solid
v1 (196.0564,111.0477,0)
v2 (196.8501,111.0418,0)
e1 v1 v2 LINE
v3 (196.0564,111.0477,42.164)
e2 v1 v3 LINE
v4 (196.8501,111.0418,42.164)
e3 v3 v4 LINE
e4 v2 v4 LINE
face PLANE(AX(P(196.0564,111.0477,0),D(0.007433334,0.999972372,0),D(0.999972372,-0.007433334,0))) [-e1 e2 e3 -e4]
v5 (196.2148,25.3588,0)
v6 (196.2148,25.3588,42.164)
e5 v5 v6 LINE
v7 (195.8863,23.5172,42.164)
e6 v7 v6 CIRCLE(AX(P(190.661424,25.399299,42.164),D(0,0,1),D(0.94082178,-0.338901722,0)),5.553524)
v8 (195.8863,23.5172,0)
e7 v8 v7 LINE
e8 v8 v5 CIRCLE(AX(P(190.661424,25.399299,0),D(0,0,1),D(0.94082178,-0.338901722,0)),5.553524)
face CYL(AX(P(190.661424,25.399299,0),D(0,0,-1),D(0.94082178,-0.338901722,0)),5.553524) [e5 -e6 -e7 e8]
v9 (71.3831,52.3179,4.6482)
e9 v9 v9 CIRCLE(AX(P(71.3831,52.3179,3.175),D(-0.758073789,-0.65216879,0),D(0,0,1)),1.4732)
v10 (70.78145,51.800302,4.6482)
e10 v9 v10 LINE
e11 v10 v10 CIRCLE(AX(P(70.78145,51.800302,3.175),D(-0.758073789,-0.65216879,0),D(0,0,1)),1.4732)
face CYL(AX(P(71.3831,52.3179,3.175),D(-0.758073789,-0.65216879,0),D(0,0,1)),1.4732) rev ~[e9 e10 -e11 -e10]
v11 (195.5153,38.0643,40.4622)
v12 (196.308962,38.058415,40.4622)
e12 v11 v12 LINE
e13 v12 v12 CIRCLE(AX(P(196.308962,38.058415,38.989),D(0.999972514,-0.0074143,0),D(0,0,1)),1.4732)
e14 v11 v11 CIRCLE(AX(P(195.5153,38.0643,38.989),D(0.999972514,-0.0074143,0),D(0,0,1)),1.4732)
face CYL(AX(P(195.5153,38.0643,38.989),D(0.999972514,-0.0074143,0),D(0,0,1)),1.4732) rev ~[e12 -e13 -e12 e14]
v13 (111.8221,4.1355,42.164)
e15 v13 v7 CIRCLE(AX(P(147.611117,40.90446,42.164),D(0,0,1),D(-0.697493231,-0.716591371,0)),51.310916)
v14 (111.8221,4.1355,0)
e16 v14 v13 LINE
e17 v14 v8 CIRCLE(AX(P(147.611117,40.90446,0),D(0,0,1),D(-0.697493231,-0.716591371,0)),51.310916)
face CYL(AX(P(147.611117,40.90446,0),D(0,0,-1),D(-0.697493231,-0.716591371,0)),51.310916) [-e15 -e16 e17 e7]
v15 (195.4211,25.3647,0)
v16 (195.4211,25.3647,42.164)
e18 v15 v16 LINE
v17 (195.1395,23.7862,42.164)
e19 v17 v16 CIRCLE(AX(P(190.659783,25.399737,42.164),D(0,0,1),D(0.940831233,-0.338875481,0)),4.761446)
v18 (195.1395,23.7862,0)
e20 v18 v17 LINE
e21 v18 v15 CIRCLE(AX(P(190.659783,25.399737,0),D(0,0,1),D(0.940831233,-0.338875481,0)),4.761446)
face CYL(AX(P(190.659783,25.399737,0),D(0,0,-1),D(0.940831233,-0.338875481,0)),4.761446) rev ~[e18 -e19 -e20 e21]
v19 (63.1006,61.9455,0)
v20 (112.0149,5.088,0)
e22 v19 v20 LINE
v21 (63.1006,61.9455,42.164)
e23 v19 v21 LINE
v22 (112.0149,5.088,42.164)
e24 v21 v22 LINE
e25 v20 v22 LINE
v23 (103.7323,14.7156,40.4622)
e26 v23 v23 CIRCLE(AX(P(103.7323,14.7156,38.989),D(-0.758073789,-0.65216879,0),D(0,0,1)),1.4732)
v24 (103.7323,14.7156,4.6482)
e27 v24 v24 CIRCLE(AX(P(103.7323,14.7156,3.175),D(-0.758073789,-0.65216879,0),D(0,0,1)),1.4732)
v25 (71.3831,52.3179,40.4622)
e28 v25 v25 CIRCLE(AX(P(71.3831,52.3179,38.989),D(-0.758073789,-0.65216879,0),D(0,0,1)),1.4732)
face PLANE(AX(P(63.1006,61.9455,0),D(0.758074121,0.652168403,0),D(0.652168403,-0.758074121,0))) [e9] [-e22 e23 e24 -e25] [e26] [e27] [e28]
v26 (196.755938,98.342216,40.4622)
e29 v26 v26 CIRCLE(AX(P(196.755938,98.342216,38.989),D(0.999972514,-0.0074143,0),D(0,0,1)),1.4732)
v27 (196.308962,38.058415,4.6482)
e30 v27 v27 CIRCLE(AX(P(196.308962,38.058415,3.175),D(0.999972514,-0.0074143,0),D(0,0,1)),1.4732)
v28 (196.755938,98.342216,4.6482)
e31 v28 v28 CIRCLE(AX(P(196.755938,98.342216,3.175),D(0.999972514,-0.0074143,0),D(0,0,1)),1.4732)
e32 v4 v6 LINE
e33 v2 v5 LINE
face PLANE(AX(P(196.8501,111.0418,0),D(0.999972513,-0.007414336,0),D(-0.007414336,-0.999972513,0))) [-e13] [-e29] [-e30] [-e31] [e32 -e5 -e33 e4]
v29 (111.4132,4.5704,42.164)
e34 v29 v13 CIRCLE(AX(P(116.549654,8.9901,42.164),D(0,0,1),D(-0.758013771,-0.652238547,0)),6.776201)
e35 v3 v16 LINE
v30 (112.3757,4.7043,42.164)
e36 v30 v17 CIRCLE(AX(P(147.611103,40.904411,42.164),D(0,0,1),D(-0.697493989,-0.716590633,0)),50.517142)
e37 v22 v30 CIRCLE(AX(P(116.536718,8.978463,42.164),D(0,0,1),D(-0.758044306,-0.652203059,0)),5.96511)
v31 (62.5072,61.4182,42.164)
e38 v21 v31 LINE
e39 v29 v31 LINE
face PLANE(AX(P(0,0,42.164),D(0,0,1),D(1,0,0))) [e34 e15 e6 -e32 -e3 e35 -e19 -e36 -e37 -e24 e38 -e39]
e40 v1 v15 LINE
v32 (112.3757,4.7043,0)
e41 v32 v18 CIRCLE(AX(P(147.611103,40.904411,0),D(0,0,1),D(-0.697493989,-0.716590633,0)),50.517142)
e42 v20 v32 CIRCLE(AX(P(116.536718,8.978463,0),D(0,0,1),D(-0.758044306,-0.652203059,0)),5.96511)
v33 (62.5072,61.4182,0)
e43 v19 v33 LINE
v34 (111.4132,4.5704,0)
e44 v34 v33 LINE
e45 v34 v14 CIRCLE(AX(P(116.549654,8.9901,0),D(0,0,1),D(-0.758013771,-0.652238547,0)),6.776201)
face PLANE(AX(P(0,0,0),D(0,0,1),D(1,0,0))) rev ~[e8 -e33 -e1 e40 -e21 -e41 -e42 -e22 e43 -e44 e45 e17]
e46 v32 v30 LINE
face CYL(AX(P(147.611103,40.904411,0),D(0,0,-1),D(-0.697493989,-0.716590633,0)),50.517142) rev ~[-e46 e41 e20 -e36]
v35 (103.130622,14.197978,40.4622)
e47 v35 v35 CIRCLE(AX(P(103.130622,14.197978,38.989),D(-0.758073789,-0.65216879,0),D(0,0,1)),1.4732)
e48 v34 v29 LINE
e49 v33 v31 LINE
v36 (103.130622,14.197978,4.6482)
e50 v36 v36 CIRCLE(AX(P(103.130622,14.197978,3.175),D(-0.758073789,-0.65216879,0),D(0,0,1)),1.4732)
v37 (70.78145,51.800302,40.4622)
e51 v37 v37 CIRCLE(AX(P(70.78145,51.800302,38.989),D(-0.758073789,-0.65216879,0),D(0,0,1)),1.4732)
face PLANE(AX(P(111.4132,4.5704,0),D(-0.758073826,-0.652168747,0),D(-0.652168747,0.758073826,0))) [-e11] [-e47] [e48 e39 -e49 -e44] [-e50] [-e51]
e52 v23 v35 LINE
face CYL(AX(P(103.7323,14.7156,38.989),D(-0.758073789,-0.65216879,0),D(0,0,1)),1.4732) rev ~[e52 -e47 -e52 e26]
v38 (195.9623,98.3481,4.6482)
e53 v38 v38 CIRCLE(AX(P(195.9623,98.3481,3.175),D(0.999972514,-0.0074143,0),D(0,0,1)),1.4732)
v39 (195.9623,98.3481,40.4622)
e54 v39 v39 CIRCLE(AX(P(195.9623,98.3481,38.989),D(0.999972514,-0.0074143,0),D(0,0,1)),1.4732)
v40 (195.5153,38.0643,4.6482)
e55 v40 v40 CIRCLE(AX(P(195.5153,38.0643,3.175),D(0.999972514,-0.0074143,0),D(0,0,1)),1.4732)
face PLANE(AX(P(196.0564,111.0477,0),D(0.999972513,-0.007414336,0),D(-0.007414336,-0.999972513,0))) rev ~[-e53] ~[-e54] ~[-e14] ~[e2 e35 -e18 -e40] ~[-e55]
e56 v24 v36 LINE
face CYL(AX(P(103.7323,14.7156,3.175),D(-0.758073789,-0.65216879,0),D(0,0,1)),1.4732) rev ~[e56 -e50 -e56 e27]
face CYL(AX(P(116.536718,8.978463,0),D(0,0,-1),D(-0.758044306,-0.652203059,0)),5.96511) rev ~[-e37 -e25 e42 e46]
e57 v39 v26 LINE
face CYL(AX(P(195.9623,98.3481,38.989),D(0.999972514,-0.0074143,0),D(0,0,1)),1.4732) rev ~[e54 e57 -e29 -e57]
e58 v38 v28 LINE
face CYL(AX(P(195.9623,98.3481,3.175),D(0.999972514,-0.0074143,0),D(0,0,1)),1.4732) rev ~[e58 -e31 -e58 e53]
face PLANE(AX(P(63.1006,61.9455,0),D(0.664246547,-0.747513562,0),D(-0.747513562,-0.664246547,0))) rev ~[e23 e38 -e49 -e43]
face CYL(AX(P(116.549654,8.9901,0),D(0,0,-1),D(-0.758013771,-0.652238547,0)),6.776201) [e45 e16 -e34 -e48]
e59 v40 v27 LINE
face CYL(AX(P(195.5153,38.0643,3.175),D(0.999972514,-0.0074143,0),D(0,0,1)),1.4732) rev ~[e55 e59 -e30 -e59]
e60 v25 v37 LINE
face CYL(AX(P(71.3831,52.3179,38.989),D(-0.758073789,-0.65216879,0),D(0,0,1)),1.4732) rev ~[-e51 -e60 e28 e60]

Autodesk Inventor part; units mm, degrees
ref_plane "YZ Plane" through (0, 0, 0) normal (1, 0, 0) x (0, 1, 0)
ref_plane "XZ Plane" through (0, 0, 0) normal (0, 1, 0) x (-1, 0, 0)
ref_plane "XY Plane" through (0, 0, 0) normal (0, 0, 1) x (1, 0, 0)
sketch "Sketch1" plane through (0, 0, 0) normal (0, 0, 1) x (1, 0, 0)
  arc A0 (66.7702, 112.6298) -> (73.6141, 138.1061) centre (52.5264, 130.1136) ccw construction
  line L0 (63.1006, 61.9455) -> (112.0149, 5.088)
  arc A1 (66.7702, 112.6298) -> (63.1006, 61.9455) centre (88.8254, 85.558) ccw construction
  arc A2 (138.8831, 162.8706) -> (162.2319, 146.2144) centre (163.0457, 172.0484) ccw construction
  arc A3 (172.0845, 144.47) -> (162.2319, 146.2144) centre (161.1324, 111.3067) ccw construction
  line L1 (196.0564, 111.0477) -> (195.4211, 25.3647)
  arc A4 (112.0149, 5.088) -> (112.3757, 4.7043) centre (116.5302, 8.9726) ccw
  arc A5 (112.3757, 4.7043) -> (195.1395, 23.7862) centre (147.6111, 40.9044) ccw
  arc A6 (195.1395, 23.7862) -> (195.4211, 25.3647) centre (190.6588, 25.4) ccw
  arc A7 (196.0564, 111.0477) -> (172.0845, 144.47) centre (161.1324, 111.3067) ccw construction
  arc A8 (138.8831, 162.8706) -> (73.6141, 138.1061) centre (105.8063, 151.6542) ccw construction
  line L2 (111.4132, 4.5704) -> (62.5072, 61.4182)
  arc A9 (66.2689, 113.2452) -> (62.5072, 61.4182) centre (88.8254, 85.558) ccw construction
  arc A10 (66.2689, 113.2452) -> (72.8769, 137.8116) centre (52.5264, 130.1136) ccw construction
  arc A11 (139.6302, 163.1392) -> (72.8769, 137.8116) centre (105.8063, 151.6542) ccw construction
  arc A12 (139.6302, 163.1392) -> (162.2569, 147.0077) centre (163.0457, 172.0484) ccw construction
  arc A13 (172.3334, 145.2237) -> (162.2569, 147.0077) centre (161.1324, 111.3067) ccw construction
  arc A14 (196.8501, 111.0418) -> (172.3334, 145.2237) centre (161.1324, 111.3067) ccw construction
  line L3 (196.8501, 111.0418) -> (196.2148, 25.3588)
  arc A15 (195.8863, 23.5172) -> (196.2148, 25.3588) centre (190.6588, 25.4) ccw
  arc A16 (111.8221, 4.1355) -> (195.8863, 23.5172) centre (147.6111, 40.9044) ccw
  arc A17 (111.4132, 4.5704) -> (111.8221, 4.1355) centre (116.5302, 8.9726) ccw
  line L4 (196.0564, 111.0477) -> (196.8501, 111.0418)
  line L5 (63.1006, 61.9455) -> (62.5072, 61.4182)
  point P0 (0, 0)
  point P1 (93.7791, 184.445)
  point P2 (71.0776, 147.9379)
  point P3 (60.2024, 105.5589)
  point P4 (195.6522, 56.526)
  point P5 (134.0244, 172.2363)
  dimension "d0" = 0.7937
extrude "Extrusion1" add sketch "Sketch1" along normal blind 42.164
sketch "Sketch2" plane through (63.1006, 61.9455, 42.164) normal (0.7580738, 0.6521688, 0) x (0, 0, -1)
  line L0 (42.164, 0) -> (42.164, -75.0025) projected
  line L1 (42.164, 0) -> (0, 0) projected
  line L2 (0, -75.0025) -> (0, 0) projected
  line L3 (42.164, -75.0025) -> (0, -75.0025) projected
  line L4 (3.175, 0) -> (3.175, -75.0025) construction
  line L5 (38.989, 0) -> (38.989, -75.0025) construction
  line L6 (42.164, -62.3025) -> (0, -62.3025) construction
  line L7 (0, -12.7) -> (42.164, -12.7) construction
  point P0 (42.164, -5.807)
  point P1 (3.175, -12.7)
  point P2 (38.989, -12.7)
  point P3 (3.175, -62.3025)
  point P4 (38.989, -62.3025)
  dimension "d4" = 3.175
  dimension "d5" = 3.175
  dimension "d6" = 12.7
  dimension "d7" = 12.7
hole "Hole1" at (71.3831, 52.3179, 38.989) at (71.3831, 52.3179, 3.175) at (103.7323, 14.7156, 38.989) at (103.7323, 14.7156, 3.175) direction (-0.7580738, -0.6521688, 0) diameter 2.9464 depth 25.4 tip angle 118 clearance for "Socket Head Cap Screw" size "#4" standard "Ansi Unified Screw Threads"
sketch "Sketch3" plane through (195.4211, 25.3647, 0) normal (-0.9999725, 0.0074143, 0) x (0, 0, 1)
  line L0 (0, 0) -> (0, 85.6854) projected
  line L1 (0, 0) -> (42.164, 0) projected
  line L2 (42.164, 85.6854) -> (42.164, 0) projected
  line L3 (0, 85.6854) -> (42.164, 85.6854) projected
  line L4 (3.175, 85.6854) -> (3.175, 0) construction
  line L5 (0, 12.7) -> (42.164, 12.7) construction
  line L6 (38.989, 85.6854) -> (38.989, 0) construction
  line L7 (0, 72.9854) -> (42.164, 72.9854) construction
  point P0 (0, -26.8129)
  point P1 (3.175, 72.9854)
  point P2 (38.989, 72.9854)
  point P3 (38.989, 12.7)
  point P4 (3.175, 12.7)
  dimension "d15" = 3.175
  dimension "d16" = 3.175
  dimension "d17" = 12.7
  dimension "d18" = 12.7
hole "Hole2" at (195.9623, 98.3481, 3.175) at (195.9623, 98.3481, 38.989) at (195.5153, 38.0643, 38.989) at (195.5153, 38.0643, 3.175) direction (0.9999725, -0.0074143, 0) diameter 2.9464 depth 25.4 tip angle 118 clearance for "Socket Head Cap Screw" size "#4" standard "Ansi Unified Screw Threads"
equation "\"d5\" = d4"
properties part number "Sheild"
